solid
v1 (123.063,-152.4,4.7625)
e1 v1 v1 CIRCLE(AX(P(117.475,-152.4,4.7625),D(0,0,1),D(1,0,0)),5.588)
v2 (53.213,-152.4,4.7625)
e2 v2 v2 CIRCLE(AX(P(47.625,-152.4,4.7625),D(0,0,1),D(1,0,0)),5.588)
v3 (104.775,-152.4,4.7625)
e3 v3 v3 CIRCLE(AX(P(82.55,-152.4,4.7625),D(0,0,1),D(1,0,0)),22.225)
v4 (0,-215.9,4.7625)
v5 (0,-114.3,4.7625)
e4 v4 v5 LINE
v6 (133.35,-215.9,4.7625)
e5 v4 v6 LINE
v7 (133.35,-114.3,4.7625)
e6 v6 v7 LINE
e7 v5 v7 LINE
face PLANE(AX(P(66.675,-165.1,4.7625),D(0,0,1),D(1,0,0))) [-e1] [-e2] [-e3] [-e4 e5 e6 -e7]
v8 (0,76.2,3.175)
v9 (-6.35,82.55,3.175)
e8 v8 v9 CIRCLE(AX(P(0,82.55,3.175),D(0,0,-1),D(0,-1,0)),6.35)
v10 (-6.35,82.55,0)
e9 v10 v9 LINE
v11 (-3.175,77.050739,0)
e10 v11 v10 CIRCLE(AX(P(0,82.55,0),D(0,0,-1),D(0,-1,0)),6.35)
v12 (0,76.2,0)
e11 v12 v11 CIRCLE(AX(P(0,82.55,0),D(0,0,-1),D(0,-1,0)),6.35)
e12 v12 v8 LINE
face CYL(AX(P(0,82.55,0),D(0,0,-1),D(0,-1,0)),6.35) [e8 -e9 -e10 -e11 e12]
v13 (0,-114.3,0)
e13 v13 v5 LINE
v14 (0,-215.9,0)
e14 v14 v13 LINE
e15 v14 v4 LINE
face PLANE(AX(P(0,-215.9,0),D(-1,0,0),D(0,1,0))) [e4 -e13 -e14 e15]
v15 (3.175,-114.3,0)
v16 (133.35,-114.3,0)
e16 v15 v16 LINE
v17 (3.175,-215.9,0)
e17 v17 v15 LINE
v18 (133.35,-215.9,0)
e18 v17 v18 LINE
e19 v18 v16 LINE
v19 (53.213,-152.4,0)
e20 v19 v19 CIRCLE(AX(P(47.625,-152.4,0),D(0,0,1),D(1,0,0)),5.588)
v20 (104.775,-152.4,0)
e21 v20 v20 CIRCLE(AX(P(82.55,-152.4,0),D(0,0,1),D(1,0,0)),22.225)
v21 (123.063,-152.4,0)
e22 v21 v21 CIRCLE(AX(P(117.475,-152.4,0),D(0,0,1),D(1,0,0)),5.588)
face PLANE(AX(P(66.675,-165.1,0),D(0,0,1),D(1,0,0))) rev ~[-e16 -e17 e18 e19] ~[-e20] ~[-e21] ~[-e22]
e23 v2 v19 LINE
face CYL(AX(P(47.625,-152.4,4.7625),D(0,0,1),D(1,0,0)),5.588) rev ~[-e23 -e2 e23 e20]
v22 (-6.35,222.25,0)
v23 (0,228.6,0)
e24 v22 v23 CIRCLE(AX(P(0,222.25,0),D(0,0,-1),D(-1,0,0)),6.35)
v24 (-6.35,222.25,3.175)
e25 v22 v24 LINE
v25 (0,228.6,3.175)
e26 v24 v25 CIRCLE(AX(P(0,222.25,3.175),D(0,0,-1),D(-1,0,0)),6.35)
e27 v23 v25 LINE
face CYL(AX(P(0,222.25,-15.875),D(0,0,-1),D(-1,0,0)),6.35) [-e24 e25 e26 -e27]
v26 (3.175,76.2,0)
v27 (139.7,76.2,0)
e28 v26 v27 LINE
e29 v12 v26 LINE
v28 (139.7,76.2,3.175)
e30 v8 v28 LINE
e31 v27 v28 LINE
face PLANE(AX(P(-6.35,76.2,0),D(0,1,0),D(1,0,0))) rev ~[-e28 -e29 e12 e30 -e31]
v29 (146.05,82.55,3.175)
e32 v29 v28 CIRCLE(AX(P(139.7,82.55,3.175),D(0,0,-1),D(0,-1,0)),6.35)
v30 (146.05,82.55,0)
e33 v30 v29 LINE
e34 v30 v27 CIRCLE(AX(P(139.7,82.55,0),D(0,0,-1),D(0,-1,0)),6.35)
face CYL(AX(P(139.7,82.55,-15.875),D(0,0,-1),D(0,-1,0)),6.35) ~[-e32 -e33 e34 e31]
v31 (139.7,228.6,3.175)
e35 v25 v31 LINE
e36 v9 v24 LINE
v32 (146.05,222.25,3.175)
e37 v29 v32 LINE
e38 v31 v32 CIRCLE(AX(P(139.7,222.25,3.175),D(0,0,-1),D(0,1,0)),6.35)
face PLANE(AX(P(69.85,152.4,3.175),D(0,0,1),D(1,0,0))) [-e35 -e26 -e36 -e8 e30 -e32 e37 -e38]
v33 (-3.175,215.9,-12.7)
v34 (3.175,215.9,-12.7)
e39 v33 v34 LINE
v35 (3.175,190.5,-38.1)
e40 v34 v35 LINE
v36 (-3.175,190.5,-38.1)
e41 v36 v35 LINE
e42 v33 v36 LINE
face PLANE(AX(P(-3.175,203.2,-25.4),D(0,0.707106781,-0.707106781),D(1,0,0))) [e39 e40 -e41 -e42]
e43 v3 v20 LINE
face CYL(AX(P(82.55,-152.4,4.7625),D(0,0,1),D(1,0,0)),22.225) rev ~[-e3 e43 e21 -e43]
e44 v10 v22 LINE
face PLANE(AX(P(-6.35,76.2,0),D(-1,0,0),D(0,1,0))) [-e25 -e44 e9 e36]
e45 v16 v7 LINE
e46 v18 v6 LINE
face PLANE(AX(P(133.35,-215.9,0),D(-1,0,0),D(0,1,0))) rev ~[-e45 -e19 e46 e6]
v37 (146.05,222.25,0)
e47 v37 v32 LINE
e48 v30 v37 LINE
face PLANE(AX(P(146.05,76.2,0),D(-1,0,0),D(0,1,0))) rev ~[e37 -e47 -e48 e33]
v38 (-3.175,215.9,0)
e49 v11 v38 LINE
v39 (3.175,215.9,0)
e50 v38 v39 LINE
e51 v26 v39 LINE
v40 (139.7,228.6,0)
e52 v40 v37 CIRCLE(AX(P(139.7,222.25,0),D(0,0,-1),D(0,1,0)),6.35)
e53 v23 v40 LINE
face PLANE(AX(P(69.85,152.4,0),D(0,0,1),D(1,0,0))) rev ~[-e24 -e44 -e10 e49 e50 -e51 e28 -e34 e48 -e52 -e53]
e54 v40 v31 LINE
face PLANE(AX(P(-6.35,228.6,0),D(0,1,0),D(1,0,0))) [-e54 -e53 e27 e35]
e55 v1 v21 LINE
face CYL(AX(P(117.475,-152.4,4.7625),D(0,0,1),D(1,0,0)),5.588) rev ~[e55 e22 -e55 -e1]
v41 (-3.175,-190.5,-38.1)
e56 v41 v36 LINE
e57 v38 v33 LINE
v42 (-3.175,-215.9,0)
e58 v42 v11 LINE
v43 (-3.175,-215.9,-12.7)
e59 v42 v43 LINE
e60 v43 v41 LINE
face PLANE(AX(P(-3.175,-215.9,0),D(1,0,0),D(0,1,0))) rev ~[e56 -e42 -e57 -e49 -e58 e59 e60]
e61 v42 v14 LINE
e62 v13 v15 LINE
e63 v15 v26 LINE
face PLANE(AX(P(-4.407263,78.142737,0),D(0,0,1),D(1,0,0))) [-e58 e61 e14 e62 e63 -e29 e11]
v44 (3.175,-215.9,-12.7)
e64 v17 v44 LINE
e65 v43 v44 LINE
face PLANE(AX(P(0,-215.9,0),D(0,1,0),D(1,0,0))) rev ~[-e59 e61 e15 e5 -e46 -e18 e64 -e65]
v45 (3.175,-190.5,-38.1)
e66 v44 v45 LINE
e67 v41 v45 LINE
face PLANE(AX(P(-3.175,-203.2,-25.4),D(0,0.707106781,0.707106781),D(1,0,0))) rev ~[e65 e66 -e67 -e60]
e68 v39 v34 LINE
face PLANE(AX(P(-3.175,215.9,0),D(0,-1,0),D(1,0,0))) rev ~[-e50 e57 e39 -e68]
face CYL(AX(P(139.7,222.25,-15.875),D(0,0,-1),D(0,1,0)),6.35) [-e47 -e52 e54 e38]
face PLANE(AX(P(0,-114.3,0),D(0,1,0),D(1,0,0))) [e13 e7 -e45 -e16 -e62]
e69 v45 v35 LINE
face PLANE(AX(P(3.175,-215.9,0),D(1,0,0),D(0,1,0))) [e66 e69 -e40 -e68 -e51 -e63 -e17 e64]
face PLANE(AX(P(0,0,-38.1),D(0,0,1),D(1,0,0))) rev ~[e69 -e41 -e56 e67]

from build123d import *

# Parameters (mm, degrees)
F0_W        = 6.35
F0_H        = 431.8
F1_DEPTH    = 38.1
F2_SIZE     = 25.4
F3_W        = 133.35
F3_H        = 101.6
F4_DEPTH    = 4.7625
F5_R        = 22.225
F5_R_2      = 5.588
F6_DEPTH    = 25.4
F7_W        = 152.4
F7_H        = 152.4
F8_DEPTH    = 3.175
F9_T1_DEPTH = 34.925
F9_T3_DEPTH = 19.05


# Not quite as in the source:
# - a fillet or chamfer that OpenCascade refuses, or shapes differently, is made with other operations: its cross-section is extruded or revolved along the edge and cut away or added


with BuildPart() as f1:
    # F0 (on Top) → F1 (new body)
    with BuildSketch(Plane.XY):
        Rectangle(F0_W, F0_H)
    extrude(amount=-F1_DEPTH)

    # F2
    f2_edges = [f1.edges().sort_by_distance(p)[0] for p in [
        (0, -215.9, -38.1),
        (0, 215.9, -38.1),
    ]]
    chamfer(f2_edges, length=F2_SIZE)

    # F3 (on Top) → F4 (join)
    with BuildSketch(Plane.XY):
        with Locations((66.675, -165.1)):
            Rectangle(F3_W, F3_H)
    extrude(amount=F4_DEPTH)

    # F5 (on face) → F6 (cut)
    with BuildSketch(Plane.XY.offset(4.7625)):
        with Locations((82.55, -152.4)):
            Circle(F5_R)
        with Locations((47.625, -152.4)):
            Circle(F5_R_2)
        with Locations((117.475, -152.4)):
            Circle(F5_R_2)
    extrude(amount=-F6_DEPTH, mode=Mode.SUBTRACT)

    # F7 (on face) → F8 (join)
    with BuildSketch(Plane.XY):
        with Locations((69.85, 152.4)):
            Rectangle(F7_W, F7_H)
    extrude(amount=F8_DEPTH)

    # F9: fillet of radius 6.35 on 4 edges, made by hand

    # F9_s2 → F9_t1 (cut)
    with BuildSketch(Plane.XY.offset(-15.875)):
        with BuildLine():
            ThreePointArc((139.7, 76.2), (144.1901280605, 78.0598719395), (146.05, 82.55))
            Line((146.05, 82.55), (146.05, 76.2))
            Line((146.05, 76.2), (139.7, 76.2))
        make_face()
        with BuildLine():
            ThreePointArc((139.7, 228.6), (144.1901280605, 226.7401280605), (146.05, 222.25))
            Line((146.05, 222.25), (146.05, 228.6))
            Line((146.05, 228.6), (139.7, 228.6))
        make_face()
        with BuildLine():
            ThreePointArc((-6.35, 222.25), (-4.4901280605, 226.7401280605), (0, 228.6))
            Line((0, 228.6), (-6.35, 228.6))
            Line((-6.35, 228.6), (-6.35, 222.25))
        make_face()
    extrude(amount=F9_T1_DEPTH, mode=Mode.SUBTRACT)

    # F9_s4 → F9_t3 (cut)
    with BuildSketch(Plane.XY):
        with BuildLine():
            ThreePointArc((0, 76.2), (-4.4901280605, 78.0598719395), (-6.35, 82.55))
            Line((-6.35, 82.55), (-6.35, 76.2))
            Line((-6.35, 76.2), (0, 76.2))
        make_face()
    extrude(amount=F9_T3_DEPTH, mode=Mode.SUBTRACT)


solid = f1.part
